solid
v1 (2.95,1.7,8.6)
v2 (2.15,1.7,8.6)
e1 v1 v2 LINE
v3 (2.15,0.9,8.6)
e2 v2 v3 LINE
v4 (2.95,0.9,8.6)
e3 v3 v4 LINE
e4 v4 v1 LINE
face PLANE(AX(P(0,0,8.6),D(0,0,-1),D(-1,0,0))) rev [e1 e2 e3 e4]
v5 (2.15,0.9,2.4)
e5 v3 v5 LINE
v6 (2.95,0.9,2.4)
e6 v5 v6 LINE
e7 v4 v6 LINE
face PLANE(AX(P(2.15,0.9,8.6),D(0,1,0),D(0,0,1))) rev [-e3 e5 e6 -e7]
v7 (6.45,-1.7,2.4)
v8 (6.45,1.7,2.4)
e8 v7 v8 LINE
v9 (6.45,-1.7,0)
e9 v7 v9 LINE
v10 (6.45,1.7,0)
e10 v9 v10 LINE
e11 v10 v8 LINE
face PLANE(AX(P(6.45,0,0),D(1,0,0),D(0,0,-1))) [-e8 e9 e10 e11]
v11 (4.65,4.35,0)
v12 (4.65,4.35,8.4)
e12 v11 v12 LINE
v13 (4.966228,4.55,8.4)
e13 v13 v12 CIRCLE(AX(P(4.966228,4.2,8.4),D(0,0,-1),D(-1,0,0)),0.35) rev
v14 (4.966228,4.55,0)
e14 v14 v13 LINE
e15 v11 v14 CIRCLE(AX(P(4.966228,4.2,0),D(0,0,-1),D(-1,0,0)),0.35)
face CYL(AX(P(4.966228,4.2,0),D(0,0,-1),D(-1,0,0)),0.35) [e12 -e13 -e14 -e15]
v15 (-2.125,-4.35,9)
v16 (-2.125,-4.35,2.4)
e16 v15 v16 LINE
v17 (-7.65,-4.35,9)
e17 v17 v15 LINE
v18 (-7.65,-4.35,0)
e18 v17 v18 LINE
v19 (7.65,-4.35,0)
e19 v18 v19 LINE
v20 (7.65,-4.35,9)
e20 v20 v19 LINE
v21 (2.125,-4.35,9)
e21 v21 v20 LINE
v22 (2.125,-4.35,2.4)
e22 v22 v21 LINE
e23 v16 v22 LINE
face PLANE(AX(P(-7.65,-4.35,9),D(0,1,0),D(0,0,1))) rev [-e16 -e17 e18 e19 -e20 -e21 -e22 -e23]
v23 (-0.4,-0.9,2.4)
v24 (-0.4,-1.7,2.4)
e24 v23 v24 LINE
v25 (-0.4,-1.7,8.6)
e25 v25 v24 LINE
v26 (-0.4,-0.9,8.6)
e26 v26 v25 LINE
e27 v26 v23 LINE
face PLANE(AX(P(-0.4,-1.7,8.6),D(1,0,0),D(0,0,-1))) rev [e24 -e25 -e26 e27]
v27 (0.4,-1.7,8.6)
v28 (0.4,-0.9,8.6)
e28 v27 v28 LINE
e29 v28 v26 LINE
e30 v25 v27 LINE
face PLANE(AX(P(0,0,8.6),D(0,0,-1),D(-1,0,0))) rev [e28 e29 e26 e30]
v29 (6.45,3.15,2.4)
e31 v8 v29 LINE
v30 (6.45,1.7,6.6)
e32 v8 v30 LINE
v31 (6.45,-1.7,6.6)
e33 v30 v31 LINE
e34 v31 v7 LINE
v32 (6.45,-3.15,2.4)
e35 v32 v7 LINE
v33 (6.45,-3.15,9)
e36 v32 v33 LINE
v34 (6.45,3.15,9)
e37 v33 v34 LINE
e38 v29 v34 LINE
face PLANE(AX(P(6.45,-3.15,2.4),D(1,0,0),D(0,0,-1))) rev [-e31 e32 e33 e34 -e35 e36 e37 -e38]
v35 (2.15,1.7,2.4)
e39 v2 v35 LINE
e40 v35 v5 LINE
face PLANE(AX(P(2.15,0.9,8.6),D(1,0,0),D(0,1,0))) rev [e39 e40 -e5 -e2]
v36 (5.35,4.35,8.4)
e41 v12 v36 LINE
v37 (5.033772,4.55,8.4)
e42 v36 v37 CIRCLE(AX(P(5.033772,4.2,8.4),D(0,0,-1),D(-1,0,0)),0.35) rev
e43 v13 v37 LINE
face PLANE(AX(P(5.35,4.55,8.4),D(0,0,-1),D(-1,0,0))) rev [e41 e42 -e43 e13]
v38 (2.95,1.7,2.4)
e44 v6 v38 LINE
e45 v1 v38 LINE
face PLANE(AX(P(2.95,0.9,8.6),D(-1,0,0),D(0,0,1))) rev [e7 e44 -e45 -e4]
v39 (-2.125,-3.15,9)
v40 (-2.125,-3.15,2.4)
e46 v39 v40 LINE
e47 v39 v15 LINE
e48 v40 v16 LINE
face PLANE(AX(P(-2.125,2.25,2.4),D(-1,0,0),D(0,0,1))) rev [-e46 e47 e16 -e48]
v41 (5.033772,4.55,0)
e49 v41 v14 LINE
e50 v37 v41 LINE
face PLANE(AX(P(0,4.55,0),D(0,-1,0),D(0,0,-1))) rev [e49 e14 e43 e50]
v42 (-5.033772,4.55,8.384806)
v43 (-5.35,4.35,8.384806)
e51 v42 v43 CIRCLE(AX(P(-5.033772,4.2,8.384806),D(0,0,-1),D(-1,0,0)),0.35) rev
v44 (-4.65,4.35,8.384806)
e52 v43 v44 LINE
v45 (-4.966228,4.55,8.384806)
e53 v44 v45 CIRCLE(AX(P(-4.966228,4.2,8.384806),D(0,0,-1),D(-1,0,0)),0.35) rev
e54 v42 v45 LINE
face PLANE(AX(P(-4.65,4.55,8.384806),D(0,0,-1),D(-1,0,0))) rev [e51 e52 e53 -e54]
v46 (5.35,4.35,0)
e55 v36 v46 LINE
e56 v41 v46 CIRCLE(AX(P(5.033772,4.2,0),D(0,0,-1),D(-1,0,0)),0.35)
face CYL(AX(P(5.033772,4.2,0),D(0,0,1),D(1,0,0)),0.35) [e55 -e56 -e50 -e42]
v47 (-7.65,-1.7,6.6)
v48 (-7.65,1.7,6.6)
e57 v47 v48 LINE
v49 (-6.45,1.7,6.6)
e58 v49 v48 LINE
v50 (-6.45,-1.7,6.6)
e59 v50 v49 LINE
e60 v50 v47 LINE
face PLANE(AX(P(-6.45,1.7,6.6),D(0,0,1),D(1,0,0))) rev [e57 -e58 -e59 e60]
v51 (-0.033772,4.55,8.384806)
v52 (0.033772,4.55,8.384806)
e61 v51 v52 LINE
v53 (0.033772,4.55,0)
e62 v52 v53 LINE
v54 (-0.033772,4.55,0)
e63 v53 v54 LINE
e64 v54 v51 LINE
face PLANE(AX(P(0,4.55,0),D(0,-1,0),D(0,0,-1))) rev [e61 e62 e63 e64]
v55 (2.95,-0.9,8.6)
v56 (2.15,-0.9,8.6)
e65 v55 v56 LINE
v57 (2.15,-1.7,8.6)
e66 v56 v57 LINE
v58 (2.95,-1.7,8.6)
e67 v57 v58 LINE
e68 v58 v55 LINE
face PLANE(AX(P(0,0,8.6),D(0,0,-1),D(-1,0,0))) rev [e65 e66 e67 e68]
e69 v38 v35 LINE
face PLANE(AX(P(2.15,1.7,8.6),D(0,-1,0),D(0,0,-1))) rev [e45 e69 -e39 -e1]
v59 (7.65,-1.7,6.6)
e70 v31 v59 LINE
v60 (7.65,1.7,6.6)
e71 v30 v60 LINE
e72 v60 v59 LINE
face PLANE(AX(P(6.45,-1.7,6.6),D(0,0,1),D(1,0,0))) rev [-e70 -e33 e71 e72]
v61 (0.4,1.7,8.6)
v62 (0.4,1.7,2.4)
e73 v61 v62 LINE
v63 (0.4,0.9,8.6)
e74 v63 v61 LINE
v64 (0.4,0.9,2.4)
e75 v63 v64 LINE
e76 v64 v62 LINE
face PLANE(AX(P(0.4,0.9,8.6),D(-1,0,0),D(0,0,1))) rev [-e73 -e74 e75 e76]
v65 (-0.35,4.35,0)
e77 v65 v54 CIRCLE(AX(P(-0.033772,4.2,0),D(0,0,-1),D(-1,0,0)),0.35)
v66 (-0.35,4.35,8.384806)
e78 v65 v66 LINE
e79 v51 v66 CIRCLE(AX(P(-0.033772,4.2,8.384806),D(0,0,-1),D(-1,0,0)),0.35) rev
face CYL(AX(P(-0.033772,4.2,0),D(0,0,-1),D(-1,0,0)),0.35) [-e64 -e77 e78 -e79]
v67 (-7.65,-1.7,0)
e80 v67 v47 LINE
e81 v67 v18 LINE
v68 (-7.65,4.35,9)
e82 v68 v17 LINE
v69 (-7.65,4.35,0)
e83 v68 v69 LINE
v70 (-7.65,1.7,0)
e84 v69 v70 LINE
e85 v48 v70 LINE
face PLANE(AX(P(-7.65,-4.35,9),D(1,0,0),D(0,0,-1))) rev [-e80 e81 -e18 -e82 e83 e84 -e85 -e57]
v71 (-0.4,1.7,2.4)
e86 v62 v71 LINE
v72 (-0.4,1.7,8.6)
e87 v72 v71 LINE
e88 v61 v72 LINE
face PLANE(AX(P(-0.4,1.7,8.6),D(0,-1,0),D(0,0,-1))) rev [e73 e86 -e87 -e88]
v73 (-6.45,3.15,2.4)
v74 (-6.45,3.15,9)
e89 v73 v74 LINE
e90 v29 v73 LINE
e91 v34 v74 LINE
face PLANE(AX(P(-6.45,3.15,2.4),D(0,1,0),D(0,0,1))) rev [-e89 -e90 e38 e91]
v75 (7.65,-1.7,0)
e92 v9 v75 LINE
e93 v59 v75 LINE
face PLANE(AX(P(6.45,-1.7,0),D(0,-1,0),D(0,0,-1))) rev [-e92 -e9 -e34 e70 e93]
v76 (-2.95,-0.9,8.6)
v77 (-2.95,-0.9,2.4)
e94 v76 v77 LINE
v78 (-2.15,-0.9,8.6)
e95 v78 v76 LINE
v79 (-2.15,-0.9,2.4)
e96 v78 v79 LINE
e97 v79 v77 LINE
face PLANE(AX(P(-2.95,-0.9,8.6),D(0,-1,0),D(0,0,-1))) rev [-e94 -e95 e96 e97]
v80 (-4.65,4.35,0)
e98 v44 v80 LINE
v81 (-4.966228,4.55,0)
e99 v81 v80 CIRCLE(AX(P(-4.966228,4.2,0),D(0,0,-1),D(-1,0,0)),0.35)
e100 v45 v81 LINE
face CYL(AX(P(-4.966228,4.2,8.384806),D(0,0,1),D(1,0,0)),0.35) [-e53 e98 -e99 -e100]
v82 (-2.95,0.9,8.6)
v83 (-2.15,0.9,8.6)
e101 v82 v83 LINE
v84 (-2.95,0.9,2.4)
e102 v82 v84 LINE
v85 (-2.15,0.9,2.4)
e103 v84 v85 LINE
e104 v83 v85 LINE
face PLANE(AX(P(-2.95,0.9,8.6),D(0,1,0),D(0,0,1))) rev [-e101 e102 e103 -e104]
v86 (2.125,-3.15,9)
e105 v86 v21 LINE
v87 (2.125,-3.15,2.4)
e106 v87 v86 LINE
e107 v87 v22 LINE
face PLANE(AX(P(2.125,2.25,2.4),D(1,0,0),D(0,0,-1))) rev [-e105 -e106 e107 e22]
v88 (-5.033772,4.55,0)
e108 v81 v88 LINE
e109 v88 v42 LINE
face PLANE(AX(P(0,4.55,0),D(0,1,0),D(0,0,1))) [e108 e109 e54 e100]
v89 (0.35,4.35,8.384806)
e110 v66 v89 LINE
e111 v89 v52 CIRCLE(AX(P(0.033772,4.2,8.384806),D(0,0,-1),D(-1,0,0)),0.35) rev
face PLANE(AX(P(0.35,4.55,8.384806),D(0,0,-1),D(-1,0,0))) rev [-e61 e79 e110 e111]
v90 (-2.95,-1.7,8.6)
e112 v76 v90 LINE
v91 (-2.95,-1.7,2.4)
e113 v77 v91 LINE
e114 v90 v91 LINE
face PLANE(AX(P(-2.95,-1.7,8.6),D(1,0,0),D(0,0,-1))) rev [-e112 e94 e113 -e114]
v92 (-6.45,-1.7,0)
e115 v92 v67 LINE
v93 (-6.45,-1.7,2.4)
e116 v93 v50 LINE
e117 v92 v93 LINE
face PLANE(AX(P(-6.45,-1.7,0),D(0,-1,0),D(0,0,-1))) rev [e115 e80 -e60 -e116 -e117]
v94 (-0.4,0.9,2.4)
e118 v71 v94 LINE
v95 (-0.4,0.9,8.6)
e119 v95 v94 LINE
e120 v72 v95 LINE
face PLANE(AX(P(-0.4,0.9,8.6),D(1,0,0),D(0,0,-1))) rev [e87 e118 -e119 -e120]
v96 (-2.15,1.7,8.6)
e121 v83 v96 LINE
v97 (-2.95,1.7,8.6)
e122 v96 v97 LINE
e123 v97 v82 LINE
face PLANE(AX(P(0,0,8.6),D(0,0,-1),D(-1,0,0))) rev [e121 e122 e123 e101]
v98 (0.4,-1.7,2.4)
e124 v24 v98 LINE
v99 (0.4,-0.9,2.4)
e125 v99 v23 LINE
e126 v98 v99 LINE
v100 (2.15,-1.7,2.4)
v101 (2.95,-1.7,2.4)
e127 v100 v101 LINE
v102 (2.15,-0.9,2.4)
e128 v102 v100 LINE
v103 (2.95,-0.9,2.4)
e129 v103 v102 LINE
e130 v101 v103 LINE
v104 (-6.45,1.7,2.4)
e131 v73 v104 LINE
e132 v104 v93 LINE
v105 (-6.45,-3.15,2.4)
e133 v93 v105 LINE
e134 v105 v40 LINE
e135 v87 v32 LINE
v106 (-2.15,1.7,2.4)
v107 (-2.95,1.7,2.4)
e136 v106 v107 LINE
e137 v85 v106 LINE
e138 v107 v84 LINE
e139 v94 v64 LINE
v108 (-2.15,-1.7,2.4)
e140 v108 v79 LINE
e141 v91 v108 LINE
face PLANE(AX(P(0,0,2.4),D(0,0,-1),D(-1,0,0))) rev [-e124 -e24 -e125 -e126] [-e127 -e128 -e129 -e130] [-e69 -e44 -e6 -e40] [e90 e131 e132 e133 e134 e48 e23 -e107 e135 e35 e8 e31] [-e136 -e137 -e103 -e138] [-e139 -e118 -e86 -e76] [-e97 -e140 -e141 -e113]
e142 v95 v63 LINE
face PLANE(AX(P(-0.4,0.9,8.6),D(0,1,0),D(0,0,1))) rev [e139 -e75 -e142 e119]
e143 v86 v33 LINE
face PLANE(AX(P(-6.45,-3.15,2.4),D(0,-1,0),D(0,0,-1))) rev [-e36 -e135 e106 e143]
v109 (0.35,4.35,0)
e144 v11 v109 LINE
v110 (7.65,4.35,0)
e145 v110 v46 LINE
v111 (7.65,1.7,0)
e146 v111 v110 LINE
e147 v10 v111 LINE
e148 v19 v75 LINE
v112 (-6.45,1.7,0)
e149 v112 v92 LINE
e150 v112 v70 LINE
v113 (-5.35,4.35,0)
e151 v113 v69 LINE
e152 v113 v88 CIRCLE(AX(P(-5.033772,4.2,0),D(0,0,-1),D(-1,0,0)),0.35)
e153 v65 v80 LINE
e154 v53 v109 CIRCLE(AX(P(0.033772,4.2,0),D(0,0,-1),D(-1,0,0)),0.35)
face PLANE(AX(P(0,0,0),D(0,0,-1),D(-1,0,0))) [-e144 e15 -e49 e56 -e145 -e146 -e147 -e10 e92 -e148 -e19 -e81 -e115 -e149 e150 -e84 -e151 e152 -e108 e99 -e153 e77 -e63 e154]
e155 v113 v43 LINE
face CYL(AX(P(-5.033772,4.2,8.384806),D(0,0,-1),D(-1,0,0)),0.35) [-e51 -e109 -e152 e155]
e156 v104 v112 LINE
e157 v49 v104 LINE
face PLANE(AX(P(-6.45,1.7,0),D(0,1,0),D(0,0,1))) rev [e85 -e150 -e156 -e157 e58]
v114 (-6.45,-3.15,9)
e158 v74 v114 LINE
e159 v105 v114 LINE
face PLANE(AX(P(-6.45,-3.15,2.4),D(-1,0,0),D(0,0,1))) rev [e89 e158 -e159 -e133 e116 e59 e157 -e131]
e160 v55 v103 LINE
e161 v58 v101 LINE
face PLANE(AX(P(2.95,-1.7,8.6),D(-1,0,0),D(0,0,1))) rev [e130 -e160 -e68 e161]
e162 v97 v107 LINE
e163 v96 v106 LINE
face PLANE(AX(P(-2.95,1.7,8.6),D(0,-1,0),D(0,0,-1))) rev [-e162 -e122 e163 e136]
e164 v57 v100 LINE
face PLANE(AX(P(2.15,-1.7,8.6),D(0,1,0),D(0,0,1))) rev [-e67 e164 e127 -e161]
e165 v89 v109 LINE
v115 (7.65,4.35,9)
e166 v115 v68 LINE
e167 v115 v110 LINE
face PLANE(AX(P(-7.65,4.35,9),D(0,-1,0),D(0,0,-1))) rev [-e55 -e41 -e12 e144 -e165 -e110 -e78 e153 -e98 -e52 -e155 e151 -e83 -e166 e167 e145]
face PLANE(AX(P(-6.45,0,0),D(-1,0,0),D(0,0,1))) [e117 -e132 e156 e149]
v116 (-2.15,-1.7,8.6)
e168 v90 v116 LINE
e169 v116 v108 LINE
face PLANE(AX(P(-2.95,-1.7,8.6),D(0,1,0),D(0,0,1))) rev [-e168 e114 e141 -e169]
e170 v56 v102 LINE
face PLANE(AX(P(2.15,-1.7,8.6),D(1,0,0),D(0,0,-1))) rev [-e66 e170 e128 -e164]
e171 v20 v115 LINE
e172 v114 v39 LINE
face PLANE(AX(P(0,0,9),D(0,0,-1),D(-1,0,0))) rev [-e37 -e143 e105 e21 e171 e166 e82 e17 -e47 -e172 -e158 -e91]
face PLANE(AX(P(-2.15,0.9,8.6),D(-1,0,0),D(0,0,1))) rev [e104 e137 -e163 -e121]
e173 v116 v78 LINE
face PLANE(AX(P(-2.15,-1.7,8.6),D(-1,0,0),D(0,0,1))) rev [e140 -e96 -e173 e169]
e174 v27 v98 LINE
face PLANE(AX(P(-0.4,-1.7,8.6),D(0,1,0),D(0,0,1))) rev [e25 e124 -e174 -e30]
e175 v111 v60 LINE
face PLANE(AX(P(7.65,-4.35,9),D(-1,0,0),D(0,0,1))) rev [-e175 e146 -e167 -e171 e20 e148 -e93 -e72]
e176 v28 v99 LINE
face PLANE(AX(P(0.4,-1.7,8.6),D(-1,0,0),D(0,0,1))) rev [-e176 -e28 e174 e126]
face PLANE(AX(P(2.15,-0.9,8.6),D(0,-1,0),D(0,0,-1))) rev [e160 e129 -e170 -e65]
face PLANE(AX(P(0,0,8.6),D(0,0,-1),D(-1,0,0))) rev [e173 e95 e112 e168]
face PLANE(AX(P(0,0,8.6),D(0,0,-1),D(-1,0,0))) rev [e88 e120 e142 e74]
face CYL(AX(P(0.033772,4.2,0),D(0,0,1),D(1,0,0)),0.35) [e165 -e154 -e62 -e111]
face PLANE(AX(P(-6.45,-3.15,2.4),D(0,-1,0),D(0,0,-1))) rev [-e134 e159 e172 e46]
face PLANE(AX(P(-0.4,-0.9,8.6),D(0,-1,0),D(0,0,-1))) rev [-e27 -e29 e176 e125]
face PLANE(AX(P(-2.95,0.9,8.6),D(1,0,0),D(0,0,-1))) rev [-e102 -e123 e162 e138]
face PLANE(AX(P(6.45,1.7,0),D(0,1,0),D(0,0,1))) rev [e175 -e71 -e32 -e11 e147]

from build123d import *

# Parameters (mm, degrees)
SKICA1_W                 = 15.3
SKICA1_H                 = 8.7
P_IDAT_VYSUNUT_M1_DEPTH  = 9
SKICA2_W                 = 12.9
SKICA2_H                 = 6.3
ODEBRAT_VYSUNUT_M1_DEPTH = 6.6
SKICA3_W                 = 4.25
SKICA3_H                 = 6.6
ODEBRAT_VYSUNUT_M2_DEPTH = 6.6
SKICA4_W                 = 6.6
SKICA4_H                 = 3.4
ODEBRAT_VYSUNUT_M3_DEPTH = 1.2
SKICA5_W                 = 6.6
SKICA5_H                 = 3.4
ODEBRAT_VYSUNUT_M4_DEPTH = 1.2
SKICA6_W                 = 0.7
SKICA6_H                 = 8.4
SKICA6_H_2               = 8.384805524
P_IDAT_VYSUNUT_M2_DEPTH  = 0.2
ZAOBLIT2_R               = 0.35
ZAOBLIT3_R               = 0.35
SKICA7_W                 = 0.8
SKICA7_H                 = 0.8
P_IDAT_VYSUNUT_M3_DEPTH  = 6.2


with BuildPart() as part:
    # Skica1 → Přidat vysunutím1 (new body)
    with BuildSketch(Plane.XY):
        Rectangle(SKICA1_W, SKICA1_H)
    extrude(amount=P_IDAT_VYSUNUT_M1_DEPTH)

    # Skica2 → Odebrat vysunutím1 (cut)
    with BuildSketch(Plane.XY.offset(9)):
        Rectangle(SKICA2_W, SKICA2_H)
    extrude(amount=-ODEBRAT_VYSUNUT_M1_DEPTH, mode=Mode.SUBTRACT)

    # Skica3 → Odebrat vysunutím2 (cut)
    with BuildSketch(Plane(origin=(0, -4.35, 0), x_dir=(-1, 0, 0), z_dir=(0, -1, 0))):
        with Locations((0, -5.7)):
            Rectangle(SKICA3_W, SKICA3_H)
    extrude(amount=-ODEBRAT_VYSUNUT_M2_DEPTH, mode=Mode.SUBTRACT)

    # Skica4 → Odebrat vysunutím3 (cut)
    with BuildSketch(Plane.ZY.offset(7.65)):
        with Locations((3.3, 0)):
            Rectangle(SKICA4_W, SKICA4_H)
    extrude(amount=-ODEBRAT_VYSUNUT_M3_DEPTH, mode=Mode.SUBTRACT)

    # Skica5 → Odebrat vysunutím4 (cut)
    with BuildSketch(Plane(origin=(7.65, 0, 0), x_dir=(0, 0, -1), z_dir=(1, 0, 0))):
        with Locations((-3.3, 0)):
            Rectangle(SKICA5_W, SKICA5_H)
    extrude(amount=-ODEBRAT_VYSUNUT_M4_DEPTH, mode=Mode.SUBTRACT)

    # Skica6 → Přidat vysunutím2 (add)
    with BuildSketch(Plane(origin=(0, 4.35, 0), x_dir=(1, 0, 0), z_dir=(0, 1, 0))):
        with Locations((5, -4.2)):
            Rectangle(SKICA6_W, SKICA6_H)
        with Locations((0, -4.192402762)):
            Rectangle(SKICA6_W, SKICA6_H_2)
        with Locations((-5, -4.192402762)):
            Rectangle(SKICA6_W, SKICA6_H_2)
    extrude(amount=P_IDAT_VYSUNUT_M2_DEPTH)

    # Zaoblit2
    # the kernel refuses this fillet: 0.35 mm, written as the material it takes off along each edge
    with BuildSketch(Plane(origin=(5.35, 4.55, 9.190569415), x_dir=(0, -1, 0), z_dir=(0, 0, -1))) as zaoblit2_piece_1:
        with BuildLine():
            CenterArc((0.35, 0.316227766), ZAOBLIT2_R, 180, 64.623066475)
            Line((0, 0.316227766), (-0.007, 0.316227766))
            Line((-0.007, 0.316227766), (-0.007, 0))
            Line((-0.007, 0), (0, -0.007))
            ThreePointArc((0, -0.007), (0.1, -0.007), (0.197, -0.006324555))
            Line((0.197, -0.006324555), (0.2, 0))
        make_face()
    extrude(amount=9.98113883, mode=Mode.SUBTRACT)

    # Zaoblit3
    # the kernel refuses this fillet: 0.35 mm, written as the material it takes off along each edge
    with BuildSketch(Plane(origin=(-5.35, 4.55, 9.175374939), x_dir=(1, 0, 0), z_dir=(0, 0, -1))) as zaoblit3_piece_1:
        with BuildLine():
            CenterArc((0.316227766, 0.35), ZAOBLIT3_R, 205.376933525, 64.623066475)
            Line((0, 0.2), (-0.006324555, 0.197))
            ThreePointArc((-0.006324555, 0.197), (-0.007, 0.1), (-0.007, 0))
            Line((-0.007, 0), (0, -0.007))
            Line((0, -0.007), (0.316227766, -0.007))
            Line((0.316227766, -0.007), (0.316227766, 0))
        make_face()
    extrude(amount=9.965944354, mode=Mode.SUBTRACT)
    with BuildSketch(Plane(origin=(-4.65, 4.55, -0.790569415), x_dir=(0, -1, 0), z_dir=(0, 0, 1))) as zaoblit3_piece_2:
        with BuildLine():
            CenterArc((0.35, -0.316227766), ZAOBLIT3_R, 115.376933525, 64.623066475)
            Line((0, -0.316227766), (-0.007, -0.316227766))
            Line((-0.007, -0.316227766), (-0.007, 0))
            Line((-0.007, 0), (0, 0.007))
            ThreePointArc((0, 0.007), (0.1, 0.007), (0.197, 0.006324555))
            Line((0.197, 0.006324555), (0.2, 0))
        make_face()
    extrude(amount=9.965944354, mode=Mode.SUBTRACT)
    with BuildSketch(Plane(origin=(-0.35, 4.55, -0.790569415), x_dir=(1, 0, 0), z_dir=(0, 0, 1))) as zaoblit3_piece_3:
        with BuildLine():
            CenterArc((0.316227766, -0.35), ZAOBLIT3_R, 90, 64.623066475)
            Line((0, -0.2), (-0.006324555, -0.197))
            ThreePointArc((-0.006324555, -0.197), (-0.007, -0.1), (-0.007, 0))
            Line((-0.007, 0), (0, 0.007))
            Line((0, 0.007), (0.316227766, 0.007))
            Line((0.316227766, 0.007), (0.316227766, 0))
        make_face()
    extrude(amount=9.965944354, mode=Mode.SUBTRACT)
    with BuildSketch(Plane(origin=(0.35, 4.55, 9.175374939), x_dir=(0, -1, 0), z_dir=(0, 0, -1))) as zaoblit3_piece_4:
        with BuildLine():
            CenterArc((0.35, 0.316227766), ZAOBLIT3_R, 180, 64.623066475)
            Line((0, 0.316227766), (-0.007, 0.316227766))
            Line((-0.007, 0.316227766), (-0.007, 0))
            Line((-0.007, 0), (0, -0.007))
            ThreePointArc((0, -0.007), (0.1, -0.007), (0.197, -0.006324555))
            Line((0.197, -0.006324555), (0.2, 0))
        make_face()
    extrude(amount=9.965944354, mode=Mode.SUBTRACT)
    with BuildSketch(Plane(origin=(4.65, 4.55, -0.790569415), x_dir=(0, -1, 0), z_dir=(0, 0, 1))) as zaoblit3_piece_5:
        with BuildLine():
            CenterArc((0.35, 0.316227766), ZAOBLIT3_R, 180, 64.623066475)
            Line((0, 0.316227766), (-0.007, 0.316227766))
            Line((-0.007, 0.316227766), (-0.007, 0))
            Line((-0.007, 0), (0, -0.007))
            ThreePointArc((0, -0.007), (0.1, -0.007), (0.197, -0.006324555))
            Line((0.197, -0.006324555), (0.2, 0))
        make_face()
    extrude(amount=9.98113883, mode=Mode.SUBTRACT)

    # Skica7 → Přidat vysunutím3 (add)
    with BuildSketch(Plane.XY.offset(2.4)):
        with Locations((-2.55, -1.3)):
            Rectangle(SKICA7_W, SKICA7_H)
        with Locations((-2.55, 1.3)):
            Rectangle(SKICA7_W, SKICA7_H)
        with Locations((0, -1.3)):
            Rectangle(SKICA7_W, SKICA7_H)
        with Locations((2.55, -1.3)):
            Rectangle(SKICA7_W, SKICA7_H)
        with Locations((2.55, 1.3)):
            Rectangle(SKICA7_W, SKICA7_H)
        with Locations((0, 1.3)):
            Rectangle(SKICA7_W, SKICA7_H)
    extrude(amount=P_IDAT_VYSUNUT_M3_DEPTH)


solid = part.part
